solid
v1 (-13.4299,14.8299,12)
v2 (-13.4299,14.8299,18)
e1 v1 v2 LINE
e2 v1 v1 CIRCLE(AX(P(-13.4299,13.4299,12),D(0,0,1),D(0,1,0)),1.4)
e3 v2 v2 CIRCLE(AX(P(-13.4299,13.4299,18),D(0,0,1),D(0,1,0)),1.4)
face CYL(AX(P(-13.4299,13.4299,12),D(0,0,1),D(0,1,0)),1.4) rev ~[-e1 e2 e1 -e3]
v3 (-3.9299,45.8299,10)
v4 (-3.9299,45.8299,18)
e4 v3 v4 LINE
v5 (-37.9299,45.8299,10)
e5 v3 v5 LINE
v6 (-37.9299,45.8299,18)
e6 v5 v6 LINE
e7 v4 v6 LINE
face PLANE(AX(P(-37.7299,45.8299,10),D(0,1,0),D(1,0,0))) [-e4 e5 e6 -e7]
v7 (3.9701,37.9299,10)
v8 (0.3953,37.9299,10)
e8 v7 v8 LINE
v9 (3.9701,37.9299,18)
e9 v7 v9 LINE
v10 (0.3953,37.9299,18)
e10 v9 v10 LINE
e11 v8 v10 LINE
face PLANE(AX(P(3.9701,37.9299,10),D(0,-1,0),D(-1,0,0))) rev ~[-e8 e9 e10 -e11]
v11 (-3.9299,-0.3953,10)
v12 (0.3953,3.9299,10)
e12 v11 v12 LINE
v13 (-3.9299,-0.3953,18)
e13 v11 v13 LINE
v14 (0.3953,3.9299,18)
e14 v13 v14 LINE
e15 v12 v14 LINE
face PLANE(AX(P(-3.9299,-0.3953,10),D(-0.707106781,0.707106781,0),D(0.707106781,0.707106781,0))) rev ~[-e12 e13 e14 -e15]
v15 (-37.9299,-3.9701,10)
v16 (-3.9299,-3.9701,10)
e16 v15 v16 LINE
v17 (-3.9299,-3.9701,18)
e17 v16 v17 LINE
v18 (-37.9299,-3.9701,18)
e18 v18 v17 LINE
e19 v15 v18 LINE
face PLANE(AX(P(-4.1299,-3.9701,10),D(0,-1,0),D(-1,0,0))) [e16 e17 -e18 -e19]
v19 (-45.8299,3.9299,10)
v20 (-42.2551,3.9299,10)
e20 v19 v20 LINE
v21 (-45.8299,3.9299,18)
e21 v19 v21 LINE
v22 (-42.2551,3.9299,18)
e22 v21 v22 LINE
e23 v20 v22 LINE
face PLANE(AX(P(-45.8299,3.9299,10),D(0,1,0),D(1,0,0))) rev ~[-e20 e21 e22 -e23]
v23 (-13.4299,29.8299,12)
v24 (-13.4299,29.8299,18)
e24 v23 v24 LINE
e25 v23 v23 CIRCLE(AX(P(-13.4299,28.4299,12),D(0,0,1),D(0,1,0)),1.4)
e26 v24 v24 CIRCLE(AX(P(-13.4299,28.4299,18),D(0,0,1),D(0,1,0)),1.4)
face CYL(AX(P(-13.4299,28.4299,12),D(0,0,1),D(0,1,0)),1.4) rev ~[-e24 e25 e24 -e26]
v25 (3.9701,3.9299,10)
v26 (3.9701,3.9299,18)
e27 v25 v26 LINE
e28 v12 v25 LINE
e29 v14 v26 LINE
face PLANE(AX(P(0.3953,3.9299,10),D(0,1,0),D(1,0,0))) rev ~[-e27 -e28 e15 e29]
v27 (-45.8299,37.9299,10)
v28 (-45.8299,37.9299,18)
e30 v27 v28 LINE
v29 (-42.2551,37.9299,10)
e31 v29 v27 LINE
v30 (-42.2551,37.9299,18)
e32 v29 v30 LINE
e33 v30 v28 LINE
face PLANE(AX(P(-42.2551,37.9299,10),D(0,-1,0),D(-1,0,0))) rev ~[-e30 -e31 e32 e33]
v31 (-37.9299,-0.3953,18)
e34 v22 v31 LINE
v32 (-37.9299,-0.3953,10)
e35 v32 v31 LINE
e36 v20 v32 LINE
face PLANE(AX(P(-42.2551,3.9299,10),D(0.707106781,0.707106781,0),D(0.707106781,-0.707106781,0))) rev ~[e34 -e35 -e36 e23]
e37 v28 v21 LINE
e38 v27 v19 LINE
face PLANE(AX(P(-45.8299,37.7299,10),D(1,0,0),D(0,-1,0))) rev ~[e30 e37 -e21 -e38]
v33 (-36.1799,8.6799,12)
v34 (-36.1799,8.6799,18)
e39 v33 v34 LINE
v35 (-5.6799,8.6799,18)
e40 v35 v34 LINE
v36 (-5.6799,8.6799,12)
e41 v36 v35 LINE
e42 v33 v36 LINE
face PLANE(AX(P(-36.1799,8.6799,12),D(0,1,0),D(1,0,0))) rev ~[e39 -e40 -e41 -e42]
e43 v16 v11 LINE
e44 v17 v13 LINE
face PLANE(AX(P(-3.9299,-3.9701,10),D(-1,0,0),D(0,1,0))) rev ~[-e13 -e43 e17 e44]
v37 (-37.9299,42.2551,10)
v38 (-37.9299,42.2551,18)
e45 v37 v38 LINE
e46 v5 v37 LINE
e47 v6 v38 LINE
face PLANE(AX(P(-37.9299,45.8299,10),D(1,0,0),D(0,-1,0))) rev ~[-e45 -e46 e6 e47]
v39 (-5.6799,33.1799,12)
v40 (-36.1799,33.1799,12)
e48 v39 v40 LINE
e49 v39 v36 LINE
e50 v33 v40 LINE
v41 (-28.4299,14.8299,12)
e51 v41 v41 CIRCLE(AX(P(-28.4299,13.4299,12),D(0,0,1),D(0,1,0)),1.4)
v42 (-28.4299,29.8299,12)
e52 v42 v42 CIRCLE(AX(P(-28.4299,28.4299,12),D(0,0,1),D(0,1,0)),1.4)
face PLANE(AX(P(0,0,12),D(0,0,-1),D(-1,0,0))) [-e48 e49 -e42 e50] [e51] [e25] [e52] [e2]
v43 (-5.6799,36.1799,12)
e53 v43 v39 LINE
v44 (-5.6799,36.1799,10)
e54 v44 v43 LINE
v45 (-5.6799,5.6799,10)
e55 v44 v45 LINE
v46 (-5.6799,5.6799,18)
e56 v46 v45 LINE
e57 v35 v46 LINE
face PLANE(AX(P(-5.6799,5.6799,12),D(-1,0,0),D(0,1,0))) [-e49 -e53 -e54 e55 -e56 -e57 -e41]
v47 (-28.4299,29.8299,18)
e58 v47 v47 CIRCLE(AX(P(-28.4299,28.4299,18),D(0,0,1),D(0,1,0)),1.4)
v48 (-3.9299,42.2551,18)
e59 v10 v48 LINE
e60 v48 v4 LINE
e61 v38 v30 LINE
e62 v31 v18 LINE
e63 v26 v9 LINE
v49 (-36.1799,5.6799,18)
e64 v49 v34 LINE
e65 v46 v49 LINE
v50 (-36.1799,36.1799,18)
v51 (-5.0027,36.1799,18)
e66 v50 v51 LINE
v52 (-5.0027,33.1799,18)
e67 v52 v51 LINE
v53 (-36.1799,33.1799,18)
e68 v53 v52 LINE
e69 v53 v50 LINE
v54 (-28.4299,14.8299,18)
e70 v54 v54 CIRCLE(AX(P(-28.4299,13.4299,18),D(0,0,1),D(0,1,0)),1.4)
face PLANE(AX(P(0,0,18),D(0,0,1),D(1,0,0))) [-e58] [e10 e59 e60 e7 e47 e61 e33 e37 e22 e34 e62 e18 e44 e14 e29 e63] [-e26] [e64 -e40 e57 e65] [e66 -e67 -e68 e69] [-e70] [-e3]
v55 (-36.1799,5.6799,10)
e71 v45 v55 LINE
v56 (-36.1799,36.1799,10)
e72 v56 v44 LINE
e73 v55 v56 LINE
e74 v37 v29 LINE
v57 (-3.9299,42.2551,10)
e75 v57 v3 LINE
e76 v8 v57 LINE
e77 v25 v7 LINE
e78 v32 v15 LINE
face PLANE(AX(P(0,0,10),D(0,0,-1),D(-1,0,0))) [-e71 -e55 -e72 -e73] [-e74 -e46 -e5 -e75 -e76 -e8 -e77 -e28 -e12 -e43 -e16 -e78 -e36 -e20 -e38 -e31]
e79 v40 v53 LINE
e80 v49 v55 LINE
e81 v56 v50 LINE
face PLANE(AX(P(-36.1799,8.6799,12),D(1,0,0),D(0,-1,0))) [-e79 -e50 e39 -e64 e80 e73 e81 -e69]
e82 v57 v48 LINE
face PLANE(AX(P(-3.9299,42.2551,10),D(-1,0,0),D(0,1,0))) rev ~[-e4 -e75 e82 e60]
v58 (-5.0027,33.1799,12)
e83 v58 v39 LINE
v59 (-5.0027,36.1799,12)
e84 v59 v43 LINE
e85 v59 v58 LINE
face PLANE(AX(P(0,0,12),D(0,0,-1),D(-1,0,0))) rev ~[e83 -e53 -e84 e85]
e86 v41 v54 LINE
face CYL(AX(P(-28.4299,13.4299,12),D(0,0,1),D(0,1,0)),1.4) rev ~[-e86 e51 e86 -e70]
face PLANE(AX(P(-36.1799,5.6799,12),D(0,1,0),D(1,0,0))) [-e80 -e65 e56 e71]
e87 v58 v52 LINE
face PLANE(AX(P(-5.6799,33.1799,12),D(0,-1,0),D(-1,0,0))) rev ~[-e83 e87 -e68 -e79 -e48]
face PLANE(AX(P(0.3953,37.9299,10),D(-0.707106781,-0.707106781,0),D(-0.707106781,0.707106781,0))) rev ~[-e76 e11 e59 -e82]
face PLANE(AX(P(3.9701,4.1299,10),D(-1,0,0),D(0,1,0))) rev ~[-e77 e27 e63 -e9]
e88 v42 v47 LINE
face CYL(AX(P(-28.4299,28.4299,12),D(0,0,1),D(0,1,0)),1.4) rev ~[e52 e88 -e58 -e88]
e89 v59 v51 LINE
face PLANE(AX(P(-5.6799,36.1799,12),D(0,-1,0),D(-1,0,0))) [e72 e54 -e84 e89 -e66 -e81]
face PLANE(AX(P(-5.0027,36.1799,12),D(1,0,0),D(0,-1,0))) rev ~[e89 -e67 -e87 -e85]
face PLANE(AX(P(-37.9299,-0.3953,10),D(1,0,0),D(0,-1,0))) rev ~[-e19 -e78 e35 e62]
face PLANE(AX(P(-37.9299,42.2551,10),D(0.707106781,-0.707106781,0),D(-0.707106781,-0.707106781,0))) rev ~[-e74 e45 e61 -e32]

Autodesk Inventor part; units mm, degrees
ref_plane "YZ Plane" through (0, 0, 0) normal (1, 0, 0) x (0, 1, 0)
ref_plane "XZ Plane" through (0, 0, 0) normal (0, 1, 0) x (-1, 0, 0)
ref_plane "Work Plane1" through (0, 0, 10) normal (0, 0, 1) x (1, 0, 0)
sketch "Sketch1" plane through (0, 0, 10) normal (0, 0, 1) x (1, 0, 0)
  line L0 (-4.0299, -0.3538) -> (-2.2322, 1.4439) construction
  arc A0 (-1.4439, 2.2322) -> (-2.2322, 1.4439) centre (-0.9299, 0.9299) ccw construction
  line L1 (-1.4439, 2.2322) -> (0.3538, 4.0299) construction
  line L2 (-37.8299, 42.2137) -> (-37.8299, 45.8299) construction
  line L3 (-37.8299, 45.8299) -> (-4.0299, 45.8299) construction
  line L4 (-4.0299, 45.8299) -> (-4.0299, 42.2137) construction
  line L5 (-4.0299, 4.0299) -> (0.3538, 4.0299) projected
  circle A1 centre (-20.9299, 20.9299) radius 17.5 construction
  line L6 (-20.9299, 58.9723) -> (17.1124, 20.9299) construction
  line L7 (17.1124, 20.9299) -> (-20.9299, -17.1124) construction
  line L8 (-20.9299, -17.1124) -> (-58.9723, 20.9299) construction
  line L9 (-58.9723, 20.9299) -> (-20.9299, 58.9723) construction
  line L10 (-20.9299, 58.9723) -> (-20.9299, -17.1124) construction
  line L11 (17.1124, 20.9299) -> (-58.9723, 20.9299) construction
  line L12 (-20.9299, 58.9723) -> (32.8701, 58.9723) construction
  line L13 (-43.2198, 43.4299) -> (1.7802, 43.4299) construction
  line L14 (1.7802, 43.4299) -> (1.7802, -1.5701) construction
  line L15 (1.7802, -1.5701) -> (-43.2198, -1.5701) construction
  line L16 (-43.2198, -1.5701) -> (-43.2198, 43.4299) construction
  line L17 (-43.2198, 5.1774) -> (-43.2198, 36.6824)
  line L18 (-43.2198, 36.6824) -> (-36.4723, 43.4299)
  line L19 (-36.4723, 43.4299) -> (-5.3876, 43.4299)
  line L20 (-5.3876, 43.4299) -> (1.7802, 36.2621)
  line L21 (1.7802, 36.2621) -> (1.7802, 5.5977)
  line L22 (1.7802, 5.5977) -> (-5.3876, -1.5701)
  line L23 (-5.3876, -1.5701) -> (-36.4723, -1.5701)
  line L24 (-36.4723, -1.5701) -> (-43.2198, 5.1774)
  line L25 (-4.0299, 42.2137) -> (-37.8299, 42.2137) projected
  line L26 (-4.0299, -0.3538) -> (-4.0299, 4.0299) projected
  line L27 (-43.2198, 43.4299) -> (-10.4667, 10.6769) construction
  line L28 (-8.5595, 8.5517) -> (1.7802, -1.5701) construction
  line L29 (1.7802, 43.4299) -> (-25.699, 15.9507) construction
  line L30 (-30.9728, 10.6769) -> (-43.2198, -1.5701) construction
  point P0 (-37.8299, 4.0299)
  dimension "d18" = 53.8
  dimension "d19" = 45
  dimension "d20" = 53.8
  dimension "d21" = 45
  dimension "d22" = 45
extrude "Extrusion1" add sketch "Sketch1" along normal blind 8
sketch "Sketch3" plane through (0, 0, 10) normal (0, 0, -1) x (-1, 0, 0)
  line L0 (37.8299, -0.4701) -> (37.8299, 4.0299) construction
  line L1 (4.0299, 4.0299) -> (4.0299, -0.4701) construction
  line L2 (37.8299, -0.4701) -> (37.8299, 1.1886) construction
  line L3 (4.0299, -3.9701) -> (4.0299, -0.3538) construction
  line L4 (45.8299, 4.0299) -> (42.2137, 4.0299) construction
  line L5 (-0.3538, 4.0299) -> (-3.9701, 4.0299) construction
  line L6 (-3.9701, 37.8299) -> (-0.3538, 37.8299) construction
  line L7 (4.0299, 42.2137) -> (4.0299, 45.8299) construction
  line L8 (37.8299, 45.8299) -> (37.8299, 42.2137) construction
  line L9 (42.2137, 37.8299) -> (45.8299, 37.8299) construction
  line L10 (37.8299, 37.7299) -> (45.8299, 37.7299)
  line L11 (45.8299, 37.7299) -> (45.8299, 4.1299)
  line L12 (45.8299, 4.1299) -> (37.8299, 4.1299)
  line L13 (37.8299, 4.1299) -> (37.8299, 37.7299)
  line L14 (37.7299, 4.0299) -> (4.1299, 4.0299)
  line L15 (4.1299, 4.0299) -> (4.1299, -3.9701)
  line L16 (4.1299, -3.9701) -> (37.7299, -3.9701)
  line L17 (37.7299, -3.9701) -> (37.7299, 4.0299)
  line L18 (4.0299, 4.1299) -> (-3.9701, 4.1299)
  line L19 (-3.9701, 4.1299) -> (-3.9701, 37.7299)
  line L20 (-3.9701, 37.7299) -> (4.0299, 37.7299)
  line L21 (4.0299, 37.7299) -> (4.0299, 4.1299)
  line L22 (4.1299, 37.8299) -> (37.7299, 37.8299)
  line L23 (37.7299, 37.8299) -> (37.7299, 45.8299)
  line L24 (37.7299, 45.8299) -> (4.1299, 45.8299)
  line L25 (4.1299, 45.8299) -> (4.1299, 37.8299)
  point P0 (0, 0)
  dimension "d23" = 0.1
  dimension "d24" = 0.1
  dimension "d25" = 0.1
  dimension "d26" = 0.1
  dimension "d27" = 0.1
extrude "Extrusion3" add sketch "Sketch3" against normal up to surface (8 mm away)
sketch "Skizze12" plane through (0, 0, 10) normal (0, 0, -1) x (-1, 0, 0)
  line L0 (-0.3124, 4.1299) -> (4.1299, -0.3124) projected
  line L1 (4.1299, -0.3124) -> (4.1299, -3.9701) projected
  line L2 (4.1299, -3.9701) -> (37.7299, -3.9701) construction
  line L3 (37.7299, -3.9701) -> (37.7299, -0.3124) projected
  line L4 (37.7299, -0.3124) -> (42.1723, 4.1299) projected
  line L5 (45.8299, 4.1299) -> (42.1723, 4.1299) projected
  line L6 (45.8299, 37.7299) -> (45.8299, 4.1299) construction
  line L7 (42.1723, 37.7299) -> (45.8299, 37.7299) projected
  line L8 (42.1723, 37.7299) -> (37.7299, 42.1723) projected
  line L9 (37.7299, 42.1723) -> (37.7299, 45.8299) projected
  line L10 (37.7299, 45.8299) -> (4.1299, 45.8299) construction
  line L11 (4.1299, 45.8299) -> (4.1299, 42.1723) projected
  line L12 (4.1299, 42.1723) -> (-0.3124, 37.7299) projected
  line L13 (-3.9701, 37.7299) -> (-0.3124, 37.7299) projected
  line L14 (-3.9701, 4.1299) -> (-3.9701, 37.7299) construction
  line L15 (-0.3124, 4.1299) -> (-3.9701, 4.1299) projected
  line L16 (37.9299, -4.1701) -> (3.9299, -4.1701) construction
  line L17 (3.9299, -4.1701) -> (3.9299, -0.3953)
  line L18 (3.9299, -0.3953) -> (-0.3953, 3.9299)
  line L19 (-0.3953, 3.9299) -> (-4.1701, 3.9299)
  line L20 (-4.1701, 3.9299) -> (-4.1701, 37.9299) construction
  line L21 (-4.1701, 37.9299) -> (-0.3953, 37.9299)
  line L22 (-0.3953, 37.9299) -> (3.9299, 42.2551)
  line L23 (3.9299, 42.2551) -> (3.9299, 46.0299)
  line L24 (3.9299, 46.0299) -> (37.9299, 46.0299) construction
  line L25 (37.9299, 46.0299) -> (37.9299, 42.2551)
  line L26 (37.9299, 42.2551) -> (42.2551, 37.9299)
  line L27 (42.2551, 37.9299) -> (46.0299, 37.9299)
  line L28 (46.0299, 37.9299) -> (46.0299, 3.9299) construction
  line L29 (46.0299, 3.9299) -> (42.2551, 3.9299)
  line L30 (42.2551, 3.9299) -> (37.9299, -0.3953)
  line L31 (37.9299, -0.3953) -> (37.9299, -4.1701)
  line L32 (-3.9701, 37.7299) -> (-3.9701, 37.9299)
  line L33 (37.7299, 45.8299) -> (4.1299, 45.8299) projected
  line L34 (4.1299, 45.8299) -> (3.9299, 45.8299)
  line L35 (37.7299, 45.8299) -> (37.9299, 45.8299)
  line L36 (45.8299, 37.7299) -> (45.8299, 37.9299)
  line L37 (45.8299, 4.1299) -> (45.8299, 3.9299)
  line L38 (37.7299, -3.9701) -> (37.9299, -3.9701)
  line L39 (4.1299, -3.9701) -> (3.9299, -3.9701)
  line L40 (-3.9701, 4.1299) -> (-3.9701, 3.9299)
  point P0 (0, 0)
  dimension "d65" = 0.2
extrude "IM_offset" add sketch "Skizze12" against normal up to surface (8 mm away)
sketch "Sketch15" plane through (0, 0, 10) normal (0, 0, -1) x (-1, 0, 0)
  line L0 (-3.9701, 3.9299) -> (-3.9701, 37.9299) projected
  line L1 (-0.3953, 3.9299) -> (-3.9701, 3.9299) projected
  line L2 (3.9299, -0.3953) -> (-0.3953, 3.9299) projected
  line L3 (3.9299, -3.9701) -> (3.9299, -0.3953) projected
  line L4 (3.9299, -3.9701) -> (37.9299, -3.9701) projected
  line L5 (37.9299, -0.3953) -> (37.9299, -3.9701) projected
  line L6 (42.2551, 3.9299) -> (37.9299, -0.3953) projected
  line L7 (45.8299, 3.9299) -> (42.2551, 3.9299) projected
  line L8 (45.8299, 3.9299) -> (45.8299, 37.9299) projected
  line L9 (45.8299, 37.9299) -> (42.2551, 37.9299) projected
  line L10 (42.2551, 37.9299) -> (37.9299, 42.2551) projected
  line L11 (37.9299, 42.2551) -> (37.9299, 45.8299) projected
  line L12 (37.9299, 45.8299) -> (3.9299, 45.8299) projected
  line L13 (3.9299, 45.8299) -> (3.9299, 42.2551) projected
  line L14 (3.9299, 42.2551) -> (-0.3953, 37.9299) projected
  line L15 (-0.3953, 37.9299) -> (-3.9701, 37.9299) projected
  line L16 (36.1799, 36.1799) -> (5.6799, 36.1799)
  line L17 (5.6799, 36.1799) -> (5.6799, 5.6799)
  line L18 (5.6799, 5.6799) -> (36.1799, 5.6799)
  line L19 (36.1799, 5.6799) -> (36.1799, 36.1799)
  line L20 (36.1799, 36.1799) -> (5.6799, 5.6799) construction
  line L21 (5.6799, 36.1799) -> (36.1799, 5.6799) construction
  point P0 (0, 0)
  point P1 (20.9299, 20.9299)
  dimension "d73" = 30.5
  dimension "d74" = 30.5
extrude "Extrusion13" cut sketch "Sketch15" against normal blind 2 contours L19 L18 L17 L16
sketch "Sketch16" plane through (0, 0, 12) normal (0, 0, -1) x (-1, 0, 0)
  line L0 (5.6799, 36.1799) -> (36.1799, 36.1799) projected
  line L1 (5.6799, 5.6799) -> (5.6799, 36.1799) projected
  line L2 (36.1799, 5.6799) -> (5.6799, 5.6799) projected
  line L3 (36.1799, 36.1799) -> (36.1799, 5.6799) projected
  line L4 (5.6799, 5.6799) -> (5.6799, 36.1799) projected
  line L5 (36.1799, 36.1799) -> (36.1799, 5.6799) projected
  line L6 (5.6799, 5.6799) -> (36.1799, 5.6799)
  line L7 (36.1799, 5.6799) -> (36.1799, 8.6799)
  line L8 (36.1799, 8.6799) -> (5.6799, 8.6799)
  line L9 (5.6799, 8.6799) -> (5.6799, 5.6799)
  line L10 (5.6799, 36.1799) -> (36.1799, 36.1799) projected
  line L11 (36.1799, 36.1799) -> (5.0027, 36.1799)
  line L12 (5.0027, 36.1799) -> (5.0027, 33.1799)
  line L13 (5.0027, 33.1799) -> (36.1799, 33.1799)
  line L14 (36.1799, 33.1799) -> (36.1799, 36.1799)
  point P0 (0, 0)
  dimension "d77" = 3
  dimension "d78" = 3
extrude "Extrusion14" cut sketch "Sketch16" against normal through all contours L0 L3 L13 L1 | L1 L13 L12 L11 | L8 L3 L2 L1
sketch "Sketch17" plane through (0, 0, 12) normal (0, 0, -1) x (-1, 0, 0)
  line L0 (5.6799, 8.6799) -> (36.1799, 8.6799) projected
  line L1 (36.1799, 33.1799) -> (36.1799, 8.6799) projected
  line L2 (36.1799, 33.1799) -> (5.6799, 33.1799) projected
  line L3 (5.6799, 8.6799) -> (5.6799, 33.1799) projected
  line L4 (28.4299, 28.4299) -> (13.4299, 28.4299)
  line L5 (13.4299, 28.4299) -> (13.4299, 13.4299)
  line L6 (13.4299, 13.4299) -> (28.4299, 13.4299)
  line L7 (28.4299, 13.4299) -> (28.4299, 28.4299)
  line L8 (28.4299, 28.4299) -> (13.4299, 13.4299) construction
  line L9 (13.4299, 28.4299) -> (28.4299, 13.4299) construction
  point P0 (0, 0)
  point P1 (20.9299, 20.9299)
  dimension "d81" = 15
  dimension "d82" = 15
hole "Hole1" at (-13.4299, 13.4299, 12) at (-13.4299, 28.4299, 12) at (-28.4299, 28.4299, 12) at (-28.4299, 13.4299, 12) direction (0, 0, 1) diameter 2.8 depth 12 tip angle 118
properties part number "20_Cube_Insert_RaspiCam_v3"
